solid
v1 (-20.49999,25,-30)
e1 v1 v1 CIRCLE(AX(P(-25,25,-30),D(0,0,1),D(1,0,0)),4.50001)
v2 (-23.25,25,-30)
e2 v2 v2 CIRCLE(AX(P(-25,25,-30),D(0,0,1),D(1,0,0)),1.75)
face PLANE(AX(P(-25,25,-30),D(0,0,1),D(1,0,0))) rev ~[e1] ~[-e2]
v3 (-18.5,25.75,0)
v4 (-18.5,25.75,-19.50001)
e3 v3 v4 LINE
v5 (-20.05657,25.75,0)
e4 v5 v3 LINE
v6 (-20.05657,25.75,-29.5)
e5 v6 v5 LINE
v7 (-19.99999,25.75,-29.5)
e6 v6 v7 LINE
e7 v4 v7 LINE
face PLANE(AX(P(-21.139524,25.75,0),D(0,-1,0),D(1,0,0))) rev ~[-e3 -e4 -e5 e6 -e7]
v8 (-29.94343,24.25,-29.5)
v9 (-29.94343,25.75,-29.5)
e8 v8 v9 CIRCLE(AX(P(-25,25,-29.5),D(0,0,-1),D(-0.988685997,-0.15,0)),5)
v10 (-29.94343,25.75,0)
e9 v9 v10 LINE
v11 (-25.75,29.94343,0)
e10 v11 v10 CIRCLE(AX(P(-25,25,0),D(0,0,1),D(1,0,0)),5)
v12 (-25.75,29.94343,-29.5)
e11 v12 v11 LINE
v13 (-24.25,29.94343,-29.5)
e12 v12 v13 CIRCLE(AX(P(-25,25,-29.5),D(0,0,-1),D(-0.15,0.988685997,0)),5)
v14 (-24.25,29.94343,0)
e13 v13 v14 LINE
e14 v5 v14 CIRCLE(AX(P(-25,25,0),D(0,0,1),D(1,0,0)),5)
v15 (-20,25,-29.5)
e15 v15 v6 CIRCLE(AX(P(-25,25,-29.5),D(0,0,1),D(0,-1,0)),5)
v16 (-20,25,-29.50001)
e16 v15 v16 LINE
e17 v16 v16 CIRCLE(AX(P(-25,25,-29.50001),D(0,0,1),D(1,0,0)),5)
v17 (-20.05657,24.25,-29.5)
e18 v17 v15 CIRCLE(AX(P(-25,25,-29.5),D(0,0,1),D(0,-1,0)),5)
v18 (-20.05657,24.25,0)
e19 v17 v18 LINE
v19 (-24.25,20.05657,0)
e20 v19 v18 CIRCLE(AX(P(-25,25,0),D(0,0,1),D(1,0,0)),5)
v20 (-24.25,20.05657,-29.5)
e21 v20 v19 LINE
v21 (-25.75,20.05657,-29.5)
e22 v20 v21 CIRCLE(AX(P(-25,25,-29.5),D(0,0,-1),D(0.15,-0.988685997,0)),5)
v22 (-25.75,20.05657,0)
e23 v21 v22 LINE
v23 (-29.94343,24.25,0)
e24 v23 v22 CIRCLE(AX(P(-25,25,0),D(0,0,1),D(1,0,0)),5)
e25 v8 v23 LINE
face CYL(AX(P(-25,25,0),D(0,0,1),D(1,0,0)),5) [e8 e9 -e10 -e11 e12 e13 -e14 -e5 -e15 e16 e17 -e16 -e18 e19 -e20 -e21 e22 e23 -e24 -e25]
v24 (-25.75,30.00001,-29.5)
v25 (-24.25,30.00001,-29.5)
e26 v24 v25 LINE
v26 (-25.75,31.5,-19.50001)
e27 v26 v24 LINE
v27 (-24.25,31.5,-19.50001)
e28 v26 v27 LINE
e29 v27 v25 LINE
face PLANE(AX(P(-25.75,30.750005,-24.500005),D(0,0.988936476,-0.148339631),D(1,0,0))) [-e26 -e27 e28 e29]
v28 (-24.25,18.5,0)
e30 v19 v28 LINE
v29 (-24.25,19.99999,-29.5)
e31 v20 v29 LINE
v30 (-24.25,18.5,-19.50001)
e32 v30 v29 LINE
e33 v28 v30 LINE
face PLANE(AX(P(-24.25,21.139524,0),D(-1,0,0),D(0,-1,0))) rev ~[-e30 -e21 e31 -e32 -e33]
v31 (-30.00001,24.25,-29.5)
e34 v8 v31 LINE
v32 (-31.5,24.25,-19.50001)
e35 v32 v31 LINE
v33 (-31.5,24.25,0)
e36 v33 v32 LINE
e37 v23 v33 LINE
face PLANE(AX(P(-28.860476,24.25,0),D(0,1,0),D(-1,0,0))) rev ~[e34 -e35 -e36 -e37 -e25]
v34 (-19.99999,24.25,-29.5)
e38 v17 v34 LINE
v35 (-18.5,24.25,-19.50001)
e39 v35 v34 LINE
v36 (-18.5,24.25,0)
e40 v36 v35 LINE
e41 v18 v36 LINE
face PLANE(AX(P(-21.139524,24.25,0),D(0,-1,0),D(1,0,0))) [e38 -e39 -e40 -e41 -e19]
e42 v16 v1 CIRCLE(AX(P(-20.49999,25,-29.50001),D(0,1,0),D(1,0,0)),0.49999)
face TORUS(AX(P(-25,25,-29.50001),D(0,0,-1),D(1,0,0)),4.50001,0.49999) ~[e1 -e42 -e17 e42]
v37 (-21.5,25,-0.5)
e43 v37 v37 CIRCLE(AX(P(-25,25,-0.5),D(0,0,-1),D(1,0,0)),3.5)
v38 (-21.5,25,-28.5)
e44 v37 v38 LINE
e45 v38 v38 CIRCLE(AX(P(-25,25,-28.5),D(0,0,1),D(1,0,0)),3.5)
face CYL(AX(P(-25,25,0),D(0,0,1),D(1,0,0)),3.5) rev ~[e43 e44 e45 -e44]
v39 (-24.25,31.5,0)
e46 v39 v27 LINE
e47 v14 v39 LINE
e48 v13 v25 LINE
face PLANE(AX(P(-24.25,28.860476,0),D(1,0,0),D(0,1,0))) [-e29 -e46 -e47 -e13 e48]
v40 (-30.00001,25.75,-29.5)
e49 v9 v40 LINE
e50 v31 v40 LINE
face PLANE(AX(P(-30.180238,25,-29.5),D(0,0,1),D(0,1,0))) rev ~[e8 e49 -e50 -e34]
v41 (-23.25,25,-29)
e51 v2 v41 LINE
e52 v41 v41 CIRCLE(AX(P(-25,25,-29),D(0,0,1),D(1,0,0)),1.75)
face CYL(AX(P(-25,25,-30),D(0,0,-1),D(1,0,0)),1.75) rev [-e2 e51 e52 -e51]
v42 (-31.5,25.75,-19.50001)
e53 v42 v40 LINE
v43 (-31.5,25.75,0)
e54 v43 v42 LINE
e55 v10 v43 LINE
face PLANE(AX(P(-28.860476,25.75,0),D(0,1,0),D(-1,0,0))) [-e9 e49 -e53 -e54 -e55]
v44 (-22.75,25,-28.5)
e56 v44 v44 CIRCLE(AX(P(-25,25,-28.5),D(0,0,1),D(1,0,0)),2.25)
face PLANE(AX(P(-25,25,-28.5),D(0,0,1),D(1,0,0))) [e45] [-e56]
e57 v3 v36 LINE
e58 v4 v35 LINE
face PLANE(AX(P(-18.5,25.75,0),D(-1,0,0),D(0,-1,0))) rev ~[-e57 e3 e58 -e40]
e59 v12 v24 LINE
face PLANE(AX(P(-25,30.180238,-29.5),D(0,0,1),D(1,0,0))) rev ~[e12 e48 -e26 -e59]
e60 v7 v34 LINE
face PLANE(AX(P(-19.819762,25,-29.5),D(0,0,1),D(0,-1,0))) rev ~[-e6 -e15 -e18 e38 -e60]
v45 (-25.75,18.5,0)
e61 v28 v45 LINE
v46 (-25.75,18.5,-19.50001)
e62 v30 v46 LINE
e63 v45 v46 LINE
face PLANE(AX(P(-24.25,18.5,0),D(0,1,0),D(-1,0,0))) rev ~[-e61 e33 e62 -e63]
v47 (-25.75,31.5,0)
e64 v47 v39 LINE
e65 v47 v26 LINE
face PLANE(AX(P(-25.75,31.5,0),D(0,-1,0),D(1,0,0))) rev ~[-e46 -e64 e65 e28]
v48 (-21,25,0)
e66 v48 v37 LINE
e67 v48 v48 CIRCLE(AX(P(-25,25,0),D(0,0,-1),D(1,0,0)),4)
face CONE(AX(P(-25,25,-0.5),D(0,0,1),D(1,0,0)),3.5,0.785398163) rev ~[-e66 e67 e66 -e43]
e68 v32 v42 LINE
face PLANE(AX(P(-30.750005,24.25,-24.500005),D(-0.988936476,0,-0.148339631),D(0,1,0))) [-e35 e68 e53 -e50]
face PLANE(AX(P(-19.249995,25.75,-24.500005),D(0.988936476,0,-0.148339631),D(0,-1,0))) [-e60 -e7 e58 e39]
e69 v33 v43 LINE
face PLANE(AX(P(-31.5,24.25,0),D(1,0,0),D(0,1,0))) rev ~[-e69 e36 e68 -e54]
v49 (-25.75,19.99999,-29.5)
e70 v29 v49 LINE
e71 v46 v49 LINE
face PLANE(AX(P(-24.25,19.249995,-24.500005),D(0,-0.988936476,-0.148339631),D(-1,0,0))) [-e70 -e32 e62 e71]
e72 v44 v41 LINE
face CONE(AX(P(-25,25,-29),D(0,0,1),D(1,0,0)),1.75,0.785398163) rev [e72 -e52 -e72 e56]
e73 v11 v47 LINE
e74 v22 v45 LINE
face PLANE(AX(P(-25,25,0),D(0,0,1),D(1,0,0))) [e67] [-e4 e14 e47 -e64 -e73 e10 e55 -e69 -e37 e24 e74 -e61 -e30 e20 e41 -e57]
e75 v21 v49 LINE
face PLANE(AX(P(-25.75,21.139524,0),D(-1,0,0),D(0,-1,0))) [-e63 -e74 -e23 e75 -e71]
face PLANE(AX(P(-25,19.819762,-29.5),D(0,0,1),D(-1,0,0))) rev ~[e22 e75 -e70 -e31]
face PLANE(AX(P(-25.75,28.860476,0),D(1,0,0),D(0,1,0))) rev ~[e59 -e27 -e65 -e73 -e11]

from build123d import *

# Parameters (mm, degrees)
F1_R        = 5
F1_R_2      = 3.5
F2_DEPTH    = 30
F4_W        = 1.5
F4_H        = 2.639524132
F5_DEPTH    = 29.5
F6_COUNT    = 4
F8_R        = 3.5
F8_R_2      = 1.75
F9_DEPTH    = 1.5
F10_SIZE2   = 1.49999
F10_SIZE    = 9.99999
F10_2_SIZE2 = 1.49999
F10_2_SIZE  = 9.99999
F10_3_SIZE2 = 1.49999
F10_3_SIZE  = 9.99999
F10_4_SIZE2 = 1.49999
F10_4_SIZE  = 9.99999
F11_SIZE    = 0.5
F12_R       = 0.49999


# Not quite as in the source:
# - a fillet or chamfer is up to 0.001 mm smaller than in the source, because OpenCascade refuses the exact size


with BuildPart() as f2:
    # F1 (on offset) → F2 (new body)
    with BuildSketch(Plane.XY):
        with Locations((-25, 25)):
            Circle(F1_R)
        with Locations((-25, 25)):
            Circle(F1_R_2, mode=Mode.SUBTRACT)
    extrude(amount=-F2_DEPTH)

    # F4 (on offset) → F5 (join)
    with BuildSketch(Plane.XY):
        with Locations((-25, 30.180237934)):
            Rectangle(F4_W, F4_H)
    extrude(amount=-F5_DEPTH)

    # F6: F2 ×4 about axis
    f6_axis = Axis((-25, 25, 0), (0, 0, 1))


with BuildPart() as f2_1:
    add(f2.part)
    for i in range(1, F6_COUNT):
        add(f2.part.rotate(f6_axis, i * 360 / F6_COUNT))

    # F8 (on offset) → F9 (join)
    with BuildSketch(Plane.XY.offset(-30)):
        with Locations((-25, 25)):
            Circle(F8_R)
        with Locations((-25, 25)):
            Circle(F8_R_2, mode=Mode.SUBTRACT)
    extrude(amount=F9_DEPTH)

    # F10 (size 10 and 1.5 in the source; OpenCascade refuses exactly that, so slightly less here)
    f10_edges = [f2_1.edges().sort_by_distance(p)[0] for p in [
        (-25, 18.5, -29.5),
    ]]
    f10_side = f2_1.faces().sort_by_distance((-25, 18.5, -14.75))[0]
    chamfer(f10_edges, length=F10_SIZE, length2=F10_SIZE2, reference=f10_side)

    # F10#2 (size 10 and 1.5 in the source; OpenCascade refuses exactly that, so slightly less here)
    f10_2_edges = [f2_1.edges().sort_by_distance(p)[0] for p in [
        (-18.5, 25, -29.5),
    ]]
    f10_2_side = f2_1.faces().sort_by_distance((-18.5, 25, -14.75))[0]
    chamfer(f10_2_edges, length=F10_2_SIZE, length2=F10_2_SIZE2, reference=f10_2_side)

    # F10#3 (size 10 and 1.5 in the source; OpenCascade refuses exactly that, so slightly less here)
    f10_3_edges = [f2_1.edges().sort_by_distance(p)[0] for p in [
        (-25, 31.5, -29.5),
    ]]
    f10_3_side = f2_1.faces().sort_by_distance((-25, 31.5, -14.75))[0]
    chamfer(f10_3_edges, length=F10_3_SIZE, length2=F10_3_SIZE2, reference=f10_3_side)

    # F10#4 (size 10 and 1.5 in the source; OpenCascade refuses exactly that, so slightly less here)
    f10_4_edges = [f2_1.edges().sort_by_distance(p)[0] for p in [
        (-31.5, 25, -29.5),
    ]]
    f10_4_side = f2_1.faces().sort_by_distance((-31.5, 25, -14.75))[0]
    chamfer(f10_4_edges, length=F10_4_SIZE, length2=F10_4_SIZE2, reference=f10_4_side)

    # F11
    f11_edges = [f2_1.edges().sort_by_distance(p)[0] for p in [
        (-28.5, 25, 0),
        (-26.75, 25, -28.5),
    ]]
    chamfer(f11_edges, length=F11_SIZE)

    # F12 (radius 0.5 in the source; OpenCascade refuses exactly that, so slightly less here)
    f12_edges = [f2_1.edges().sort_by_distance(p)[0] for p in [
        (-30, 25, -30),
    ]]
    fillet(f12_edges, radius=F12_R)


solid = f2_1.part
